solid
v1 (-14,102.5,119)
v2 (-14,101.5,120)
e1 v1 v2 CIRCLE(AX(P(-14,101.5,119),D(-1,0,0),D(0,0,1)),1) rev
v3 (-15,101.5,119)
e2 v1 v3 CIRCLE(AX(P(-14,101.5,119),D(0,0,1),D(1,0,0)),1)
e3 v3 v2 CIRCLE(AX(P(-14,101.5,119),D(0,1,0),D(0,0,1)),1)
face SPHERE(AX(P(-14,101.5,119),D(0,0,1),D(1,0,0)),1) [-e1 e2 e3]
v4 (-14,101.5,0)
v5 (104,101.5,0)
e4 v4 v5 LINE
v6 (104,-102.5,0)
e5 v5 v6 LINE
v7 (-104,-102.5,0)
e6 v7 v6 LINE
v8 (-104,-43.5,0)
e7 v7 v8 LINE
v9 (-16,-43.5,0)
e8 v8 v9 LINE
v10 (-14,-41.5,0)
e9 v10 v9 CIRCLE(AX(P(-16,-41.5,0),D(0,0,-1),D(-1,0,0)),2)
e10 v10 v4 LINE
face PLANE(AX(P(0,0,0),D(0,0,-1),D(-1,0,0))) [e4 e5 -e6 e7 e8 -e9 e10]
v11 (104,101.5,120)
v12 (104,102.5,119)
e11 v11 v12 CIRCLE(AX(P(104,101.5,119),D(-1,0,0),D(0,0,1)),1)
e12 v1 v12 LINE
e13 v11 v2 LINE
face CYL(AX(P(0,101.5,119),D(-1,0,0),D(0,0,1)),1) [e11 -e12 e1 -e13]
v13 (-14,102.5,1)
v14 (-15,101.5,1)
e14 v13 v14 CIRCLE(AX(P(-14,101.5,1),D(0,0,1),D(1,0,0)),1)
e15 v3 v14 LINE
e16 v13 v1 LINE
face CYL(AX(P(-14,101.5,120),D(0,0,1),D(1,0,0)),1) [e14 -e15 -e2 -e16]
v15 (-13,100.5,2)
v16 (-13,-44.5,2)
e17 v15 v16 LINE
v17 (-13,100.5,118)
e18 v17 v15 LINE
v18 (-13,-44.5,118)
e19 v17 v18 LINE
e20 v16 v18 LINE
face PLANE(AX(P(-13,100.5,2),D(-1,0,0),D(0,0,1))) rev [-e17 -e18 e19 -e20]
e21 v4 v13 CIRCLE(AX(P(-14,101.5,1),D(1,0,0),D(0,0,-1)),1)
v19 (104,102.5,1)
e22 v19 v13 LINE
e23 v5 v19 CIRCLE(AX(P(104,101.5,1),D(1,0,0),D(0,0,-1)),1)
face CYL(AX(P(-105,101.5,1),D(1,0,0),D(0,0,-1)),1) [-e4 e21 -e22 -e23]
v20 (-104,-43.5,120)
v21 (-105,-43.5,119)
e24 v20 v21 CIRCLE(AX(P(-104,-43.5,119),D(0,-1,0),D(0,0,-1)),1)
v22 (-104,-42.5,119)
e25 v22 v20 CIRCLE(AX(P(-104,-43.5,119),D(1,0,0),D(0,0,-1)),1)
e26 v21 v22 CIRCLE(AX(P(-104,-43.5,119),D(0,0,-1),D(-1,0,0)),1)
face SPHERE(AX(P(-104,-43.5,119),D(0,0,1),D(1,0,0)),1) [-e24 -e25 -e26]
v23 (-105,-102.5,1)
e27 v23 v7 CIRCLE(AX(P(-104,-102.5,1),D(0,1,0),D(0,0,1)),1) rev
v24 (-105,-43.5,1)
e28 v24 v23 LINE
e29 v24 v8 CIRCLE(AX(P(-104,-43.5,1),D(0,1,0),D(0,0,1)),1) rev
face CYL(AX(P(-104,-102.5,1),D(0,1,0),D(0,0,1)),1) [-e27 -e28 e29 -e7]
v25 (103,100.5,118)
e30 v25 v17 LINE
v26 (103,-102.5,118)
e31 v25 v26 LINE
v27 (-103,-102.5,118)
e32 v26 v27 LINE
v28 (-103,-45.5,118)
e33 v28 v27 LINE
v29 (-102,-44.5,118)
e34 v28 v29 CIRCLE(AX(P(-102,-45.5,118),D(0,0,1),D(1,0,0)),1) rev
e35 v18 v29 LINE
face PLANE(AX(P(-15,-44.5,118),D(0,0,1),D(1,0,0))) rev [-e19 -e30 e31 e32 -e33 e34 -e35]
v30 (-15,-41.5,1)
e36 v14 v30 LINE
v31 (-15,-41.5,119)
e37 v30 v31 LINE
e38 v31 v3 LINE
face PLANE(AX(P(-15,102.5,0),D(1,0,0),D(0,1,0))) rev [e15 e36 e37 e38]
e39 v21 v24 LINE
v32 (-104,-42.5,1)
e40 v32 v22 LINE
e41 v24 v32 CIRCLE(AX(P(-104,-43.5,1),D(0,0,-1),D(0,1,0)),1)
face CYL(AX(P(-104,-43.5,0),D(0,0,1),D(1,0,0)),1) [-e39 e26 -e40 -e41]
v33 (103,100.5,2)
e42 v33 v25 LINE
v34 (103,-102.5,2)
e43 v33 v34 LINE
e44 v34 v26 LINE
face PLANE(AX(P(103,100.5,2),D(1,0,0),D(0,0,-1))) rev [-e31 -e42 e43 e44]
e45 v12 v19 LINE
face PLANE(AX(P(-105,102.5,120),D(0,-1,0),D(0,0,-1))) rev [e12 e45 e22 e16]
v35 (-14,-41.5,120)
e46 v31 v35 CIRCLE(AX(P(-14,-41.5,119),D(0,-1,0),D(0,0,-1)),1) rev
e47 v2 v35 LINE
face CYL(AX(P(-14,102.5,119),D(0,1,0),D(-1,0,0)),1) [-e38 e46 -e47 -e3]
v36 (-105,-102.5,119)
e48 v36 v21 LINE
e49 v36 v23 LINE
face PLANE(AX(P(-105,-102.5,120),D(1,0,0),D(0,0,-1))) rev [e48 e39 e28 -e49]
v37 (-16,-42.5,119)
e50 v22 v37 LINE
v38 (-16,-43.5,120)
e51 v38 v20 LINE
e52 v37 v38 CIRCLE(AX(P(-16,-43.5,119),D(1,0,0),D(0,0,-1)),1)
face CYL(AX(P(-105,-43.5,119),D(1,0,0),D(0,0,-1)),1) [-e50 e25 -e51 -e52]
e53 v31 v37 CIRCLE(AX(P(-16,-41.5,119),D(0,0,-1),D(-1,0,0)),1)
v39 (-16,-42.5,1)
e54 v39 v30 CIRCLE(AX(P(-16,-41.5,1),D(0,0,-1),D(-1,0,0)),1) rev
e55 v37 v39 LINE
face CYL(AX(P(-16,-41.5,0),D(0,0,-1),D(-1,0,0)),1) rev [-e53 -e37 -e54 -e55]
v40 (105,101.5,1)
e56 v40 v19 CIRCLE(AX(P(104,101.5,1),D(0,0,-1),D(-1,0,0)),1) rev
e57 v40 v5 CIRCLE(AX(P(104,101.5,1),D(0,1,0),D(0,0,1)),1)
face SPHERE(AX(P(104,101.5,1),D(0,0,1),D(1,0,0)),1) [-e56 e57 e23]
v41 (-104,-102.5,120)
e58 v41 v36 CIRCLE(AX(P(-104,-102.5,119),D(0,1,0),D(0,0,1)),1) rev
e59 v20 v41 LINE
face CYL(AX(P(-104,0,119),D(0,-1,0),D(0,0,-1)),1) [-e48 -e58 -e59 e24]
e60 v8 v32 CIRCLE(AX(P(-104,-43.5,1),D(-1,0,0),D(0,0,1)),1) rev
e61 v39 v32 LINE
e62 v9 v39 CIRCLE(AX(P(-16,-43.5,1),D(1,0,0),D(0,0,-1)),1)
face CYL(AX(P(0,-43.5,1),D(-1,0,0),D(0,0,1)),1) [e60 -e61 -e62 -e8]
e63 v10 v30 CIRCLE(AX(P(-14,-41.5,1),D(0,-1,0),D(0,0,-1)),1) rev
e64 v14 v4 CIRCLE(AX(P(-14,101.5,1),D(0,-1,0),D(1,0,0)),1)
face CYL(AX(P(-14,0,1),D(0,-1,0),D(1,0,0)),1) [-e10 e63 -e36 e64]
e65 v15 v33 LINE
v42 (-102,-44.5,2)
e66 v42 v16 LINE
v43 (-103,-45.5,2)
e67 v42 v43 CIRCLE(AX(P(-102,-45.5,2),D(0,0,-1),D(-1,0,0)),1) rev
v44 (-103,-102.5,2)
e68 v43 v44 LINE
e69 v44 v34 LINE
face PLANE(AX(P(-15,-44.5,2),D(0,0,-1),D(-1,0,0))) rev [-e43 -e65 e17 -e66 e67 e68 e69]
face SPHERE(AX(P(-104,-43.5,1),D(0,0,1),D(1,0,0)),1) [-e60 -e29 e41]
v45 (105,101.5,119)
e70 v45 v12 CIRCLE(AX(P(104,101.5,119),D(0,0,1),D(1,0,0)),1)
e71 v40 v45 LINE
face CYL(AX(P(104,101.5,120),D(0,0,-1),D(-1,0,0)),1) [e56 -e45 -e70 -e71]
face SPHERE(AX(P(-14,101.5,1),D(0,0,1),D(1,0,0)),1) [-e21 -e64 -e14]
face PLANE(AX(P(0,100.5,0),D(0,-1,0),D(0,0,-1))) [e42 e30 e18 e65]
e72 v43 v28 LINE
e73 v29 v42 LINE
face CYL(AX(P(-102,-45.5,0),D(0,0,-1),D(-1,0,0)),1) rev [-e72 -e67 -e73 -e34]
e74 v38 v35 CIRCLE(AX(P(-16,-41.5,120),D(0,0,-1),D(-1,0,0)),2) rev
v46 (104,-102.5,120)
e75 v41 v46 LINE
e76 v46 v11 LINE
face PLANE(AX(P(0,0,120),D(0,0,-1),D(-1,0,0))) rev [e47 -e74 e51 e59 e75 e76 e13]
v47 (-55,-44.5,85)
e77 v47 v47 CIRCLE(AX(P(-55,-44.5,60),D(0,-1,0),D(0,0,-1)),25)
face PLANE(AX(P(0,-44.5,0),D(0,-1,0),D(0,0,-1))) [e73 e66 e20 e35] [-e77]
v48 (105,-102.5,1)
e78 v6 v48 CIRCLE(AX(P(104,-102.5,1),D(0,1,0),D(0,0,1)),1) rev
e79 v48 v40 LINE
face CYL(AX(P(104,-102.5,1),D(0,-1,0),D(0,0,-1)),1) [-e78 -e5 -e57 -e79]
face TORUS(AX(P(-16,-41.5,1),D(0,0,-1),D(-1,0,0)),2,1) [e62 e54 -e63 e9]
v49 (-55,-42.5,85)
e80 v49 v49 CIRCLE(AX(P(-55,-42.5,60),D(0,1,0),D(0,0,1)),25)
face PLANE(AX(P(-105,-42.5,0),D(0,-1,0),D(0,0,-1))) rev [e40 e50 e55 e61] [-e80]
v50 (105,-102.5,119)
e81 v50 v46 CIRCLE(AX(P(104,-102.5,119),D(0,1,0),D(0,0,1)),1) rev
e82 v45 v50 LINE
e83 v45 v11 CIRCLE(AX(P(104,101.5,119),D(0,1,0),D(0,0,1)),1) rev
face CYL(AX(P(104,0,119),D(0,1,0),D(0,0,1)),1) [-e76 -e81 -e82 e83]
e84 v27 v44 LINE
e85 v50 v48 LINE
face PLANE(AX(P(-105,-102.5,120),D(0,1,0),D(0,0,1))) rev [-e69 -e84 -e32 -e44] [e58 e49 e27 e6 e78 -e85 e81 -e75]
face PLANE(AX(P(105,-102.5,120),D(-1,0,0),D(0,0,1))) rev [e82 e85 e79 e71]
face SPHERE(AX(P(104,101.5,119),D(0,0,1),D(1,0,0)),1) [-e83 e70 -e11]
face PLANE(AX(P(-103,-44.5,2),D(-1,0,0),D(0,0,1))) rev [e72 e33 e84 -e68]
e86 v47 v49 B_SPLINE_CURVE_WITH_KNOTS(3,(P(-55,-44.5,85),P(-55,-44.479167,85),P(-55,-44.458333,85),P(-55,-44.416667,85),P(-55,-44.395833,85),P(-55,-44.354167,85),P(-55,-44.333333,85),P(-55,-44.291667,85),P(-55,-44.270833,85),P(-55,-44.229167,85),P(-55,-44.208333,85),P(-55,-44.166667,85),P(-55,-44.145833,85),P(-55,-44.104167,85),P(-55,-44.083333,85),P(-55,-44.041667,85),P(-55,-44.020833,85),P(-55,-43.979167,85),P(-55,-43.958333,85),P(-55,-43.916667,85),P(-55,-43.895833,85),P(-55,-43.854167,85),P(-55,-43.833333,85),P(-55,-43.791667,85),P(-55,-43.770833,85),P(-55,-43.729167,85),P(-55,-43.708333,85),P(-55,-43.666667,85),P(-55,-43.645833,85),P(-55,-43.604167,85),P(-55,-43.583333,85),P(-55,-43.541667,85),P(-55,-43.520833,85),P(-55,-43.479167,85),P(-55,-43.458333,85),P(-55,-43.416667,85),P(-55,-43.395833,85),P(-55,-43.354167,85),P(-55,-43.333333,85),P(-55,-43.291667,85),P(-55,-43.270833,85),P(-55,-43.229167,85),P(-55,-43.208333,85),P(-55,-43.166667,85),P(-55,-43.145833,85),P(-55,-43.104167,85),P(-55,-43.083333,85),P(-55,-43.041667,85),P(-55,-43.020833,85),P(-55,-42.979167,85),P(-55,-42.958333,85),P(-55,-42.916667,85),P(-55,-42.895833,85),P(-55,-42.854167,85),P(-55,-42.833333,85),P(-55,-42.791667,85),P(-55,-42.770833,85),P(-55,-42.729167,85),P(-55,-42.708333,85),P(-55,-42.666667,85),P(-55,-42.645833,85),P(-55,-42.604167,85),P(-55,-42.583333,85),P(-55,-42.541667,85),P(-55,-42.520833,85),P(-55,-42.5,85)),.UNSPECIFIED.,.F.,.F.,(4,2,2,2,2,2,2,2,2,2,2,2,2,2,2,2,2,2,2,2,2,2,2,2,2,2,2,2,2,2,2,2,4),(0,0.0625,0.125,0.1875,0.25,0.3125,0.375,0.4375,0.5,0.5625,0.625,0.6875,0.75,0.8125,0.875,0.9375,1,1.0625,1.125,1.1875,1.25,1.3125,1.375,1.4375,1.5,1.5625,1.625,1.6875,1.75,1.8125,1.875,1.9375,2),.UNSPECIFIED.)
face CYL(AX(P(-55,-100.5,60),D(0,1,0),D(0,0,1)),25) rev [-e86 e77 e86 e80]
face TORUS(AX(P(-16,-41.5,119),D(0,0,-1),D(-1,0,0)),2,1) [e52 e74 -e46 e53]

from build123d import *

# Parameters (mm, degrees)
SKETCH1_W           = 210
SKETCH1_H           = 205
BOSS_EXTRUDE1_DEPTH = 120
SKETCH2_W           = 90
SKETCH2_H           = 145
CUT_EXTRUDE1_DEPTH  = 120
SKETCH3_W           = 88
SKETCH3_H           = 116
CUT_EXTRUDE4_DEPTH  = 58
SKETCH6_W           = 116
SKETCH6_H           = 116
CUT_EXTRUDE6_DEPTH  = 203
SKETCH7_W           = 2
SKETCH7_H           = 116
CUT_EXTRUDE7_DEPTH  = 58
FILLET1_R           = 1
FILLET2_R           = 1
FILLET3_R           = 1
SKETCH8_R           = 25
CUT_EXTRUDE8_DEPTH  = 58


with BuildPart() as part:
    # Sketch1 → Boss-Extrude1 (new body)
    with BuildSketch(Plane.XY):
        Rectangle(SKETCH1_W, SKETCH1_H)
    extrude(amount=BOSS_EXTRUDE1_DEPTH)

    # Sketch2 → Cut-Extrude1 (cut)
    with BuildSketch(Plane.XY.offset(120)):
        with Locations((-60, 30)):
            Rectangle(SKETCH2_W, SKETCH2_H)
    extrude(amount=-CUT_EXTRUDE1_DEPTH, mode=Mode.SUBTRACT)

    # Sketch3 → Cut-Extrude4 (cut)
    with BuildSketch(Plane.XZ.offset(102.5)):
        with Locations((-59, 60)):
            Rectangle(SKETCH3_W, SKETCH3_H)
    extrude(amount=-CUT_EXTRUDE4_DEPTH, mode=Mode.SUBTRACT)

    # Sketch6 → Cut-Extrude6 (cut)
    with BuildSketch(Plane(origin=(0, -102.5, 0), x_dir=(-1, 0, 0), z_dir=(0, -1, 0))):
        with Locations((-45, -60)):
            Rectangle(SKETCH6_W, SKETCH6_H)
    extrude(amount=-CUT_EXTRUDE6_DEPTH, mode=Mode.SUBTRACT)

    # Sketch7 → Cut-Extrude7 (cut)
    with BuildSketch(Plane(origin=(0, -102.5, 0), x_dir=(-1, 0, 0), z_dir=(0, -1, 0))):
        with Locations((14, -60)):
            Rectangle(SKETCH7_W, SKETCH7_H)
    extrude(amount=-CUT_EXTRUDE7_DEPTH, mode=Mode.SUBTRACT)

    # Fillet1
    fillet1_edges = [part.edges().sort_by_distance(p)[0] for p in [
        (-105, -72.5, 0),
        (-105, -72.5, 120),
        (-15, 30, 0),
        (-15, 102.5, 60),
        (-60, -42.5, 0),
        (-15, -42.5, 60),
        (-60, -42.5, 120),
        (-15, 30, 120),
        (-103, -44.5, 60),
        (105, 0, 120),
        (45, 102.5, 120),
    ]]
    fillet(fillet1_edges, radius=FILLET1_R)

    # Fillet2
    # the kernel refuses this fillet: 1 mm, written as the material it takes off along each edge
    with BuildSketch(Plane(origin=(-14, 101.5, 1), x_dir=(0, 1, 0), z_dir=(0, 0, -1))) as fillet2_piece_1_section:
        Polygon((0, 0), (FILLET2_R, 0), (FILLET2_R, -FILLET2_R), (0, -FILLET2_R), align=None)
    fillet2_piece_1 = extrude(amount=FILLET2_R, mode=Mode.PRIVATE)
    fillet2_piece_1 = fillet2_piece_1 - Plane(origin=(-14, 101.5, 1), x_dir=(0.7071067811865476, -0.7071067811865475, 0), z_dir=(0, 0, -1)) * Sphere(FILLET2_R, mode=Mode.PRIVATE)
    add(fillet2_piece_1, mode=Mode.SUBTRACT)
    with BuildSketch(Plane(origin=(104, 101.5, 119), x_dir=(0, 1, 0), z_dir=(1, 0, 0))) as fillet2_piece_2_section:
        Polygon((0, 0), (FILLET2_R, 0), (FILLET2_R, FILLET2_R), (0, FILLET2_R), align=None)
    fillet2_piece_2 = extrude(amount=FILLET2_R, mode=Mode.PRIVATE)
    fillet2_piece_2 = fillet2_piece_2 - Plane(origin=(104, 101.5, 119), x_dir=(0, -0.7071067811865475, -0.7071067811865475), z_dir=(1, 0, 0)) * Sphere(FILLET2_R, mode=Mode.PRIVATE)
    add(fillet2_piece_2, mode=Mode.SUBTRACT)
    with BuildSketch(Plane(origin=(104, 101.5, 1), x_dir=(1, 0, 0), z_dir=(0, 0, -1))) as fillet2_piece_3_section:
        Polygon((0, 0), (FILLET2_R, 0), (FILLET2_R, -FILLET2_R), (0, -FILLET2_R), align=None)
    fillet2_piece_3 = extrude(amount=FILLET2_R, mode=Mode.PRIVATE)
    fillet2_piece_3 = fillet2_piece_3 - Plane(origin=(104, 101.5, 1), x_dir=(-0.7071067811865475, -0.7071067811865475, 0), z_dir=(0, 0, -1)) * Sphere(FILLET2_R, mode=Mode.PRIVATE)
    add(fillet2_piece_3, mode=Mode.SUBTRACT)
    with BuildSketch(Plane(origin=(104, 102.5, 0), x_dir=(0, -1, 0), z_dir=(-1, 0, 0))) as fillet2_piece_4:
        with BuildLine():
            CenterArc((FILLET2_R, FILLET2_R), FILLET2_R, 180, 90)
            Line((0, FILLET2_R), (0, 0))
            Line((0, 0), (FILLET2_R, 0))
        make_face()
    extrude(amount=118, mode=Mode.SUBTRACT)
    with BuildSketch(Plane(origin=(105, -105, 0), x_dir=(-1, 0, 0), z_dir=(0, 1, 0))) as fillet2_piece_5:
        with BuildLine():
            CenterArc((FILLET2_R, FILLET2_R), FILLET2_R, 180, 90)
            Line((0, FILLET2_R), (0, 0))
            Line((0, 0), (FILLET2_R, 0))
        make_face()
    extrude(amount=206.5, mode=Mode.SUBTRACT)
    with BuildSketch(Plane(origin=(105, 102.5, 1), x_dir=(0, -1, 0), z_dir=(0, 0, 1))) as fillet2_piece_6:
        with BuildLine():
            CenterArc((FILLET2_R, -FILLET2_R), FILLET2_R, 90, 90)
            Line((0, -FILLET2_R), (0, 0))
            Line((0, 0), (FILLET2_R, 0))
        make_face()
    extrude(amount=118, mode=Mode.SUBTRACT)

    # Fillet3
    # the kernel refuses this fillet: 1 mm, written as the material it takes off along each edge
    with BuildSketch(Plane(origin=(-104, -43.5, 1), x_dir=(0, 1, 0), z_dir=(-1, 0, 0))) as fillet3_piece_1_section:
        Polygon((0, 0), (FILLET3_R, 0), (FILLET3_R, FILLET3_R), (0, FILLET3_R), align=None)
    fillet3_piece_1 = extrude(amount=FILLET3_R, mode=Mode.PRIVATE)
    fillet3_piece_1 = fillet3_piece_1 - Plane(origin=(-104, -43.5, 1), x_dir=(0, -0.7071067811865475, 0.7071067811865475), z_dir=(-1, 0, 0)) * Sphere(FILLET3_R, mode=Mode.PRIVATE)
    add(fillet3_piece_1, mode=Mode.SUBTRACT)
    with BuildSketch(Plane(origin=(-104, -43.5, 119), x_dir=(0, 1, 0), z_dir=(-1, 0, 0))) as fillet3_piece_2_section:
        Polygon((0, 0), (FILLET3_R, 0), (FILLET3_R, -FILLET3_R), (0, -FILLET3_R), align=None)
    fillet3_piece_2 = extrude(amount=FILLET3_R, mode=Mode.PRIVATE)
    fillet3_piece_2 = fillet3_piece_2 - Plane(origin=(-104, -43.5, 119), x_dir=(0, -0.7071067811865475, -0.7071067811865475), z_dir=(-1, 0, 0)) * Sphere(FILLET3_R, mode=Mode.PRIVATE)
    add(fillet3_piece_2, mode=Mode.SUBTRACT)
    with BuildSketch(Plane(origin=(-105, -42.5, 119), x_dir=(0, -1, 0), z_dir=(0, 0, -1))) as fillet3_piece_3:
        with BuildLine():
            CenterArc((FILLET3_R, -FILLET3_R), FILLET3_R, 90, 90)
            Line((0, -FILLET3_R), (0, 0))
            Line((0, 0), (FILLET3_R, 0))
        make_face()
    extrude(amount=118, mode=Mode.SUBTRACT)

    # Sketch8 → Cut-Extrude8 (cut)
    with BuildSketch(Plane(origin=(0, -42.5, 0), x_dir=(1, 0, 0), z_dir=(0, 1, 0))):
        with Locations(Location((-55, -60, 0), (0, 0, 270))):
            Circle(SKETCH8_R)
    extrude(amount=-CUT_EXTRUDE8_DEPTH, mode=Mode.SUBTRACT)


solid = part.part
